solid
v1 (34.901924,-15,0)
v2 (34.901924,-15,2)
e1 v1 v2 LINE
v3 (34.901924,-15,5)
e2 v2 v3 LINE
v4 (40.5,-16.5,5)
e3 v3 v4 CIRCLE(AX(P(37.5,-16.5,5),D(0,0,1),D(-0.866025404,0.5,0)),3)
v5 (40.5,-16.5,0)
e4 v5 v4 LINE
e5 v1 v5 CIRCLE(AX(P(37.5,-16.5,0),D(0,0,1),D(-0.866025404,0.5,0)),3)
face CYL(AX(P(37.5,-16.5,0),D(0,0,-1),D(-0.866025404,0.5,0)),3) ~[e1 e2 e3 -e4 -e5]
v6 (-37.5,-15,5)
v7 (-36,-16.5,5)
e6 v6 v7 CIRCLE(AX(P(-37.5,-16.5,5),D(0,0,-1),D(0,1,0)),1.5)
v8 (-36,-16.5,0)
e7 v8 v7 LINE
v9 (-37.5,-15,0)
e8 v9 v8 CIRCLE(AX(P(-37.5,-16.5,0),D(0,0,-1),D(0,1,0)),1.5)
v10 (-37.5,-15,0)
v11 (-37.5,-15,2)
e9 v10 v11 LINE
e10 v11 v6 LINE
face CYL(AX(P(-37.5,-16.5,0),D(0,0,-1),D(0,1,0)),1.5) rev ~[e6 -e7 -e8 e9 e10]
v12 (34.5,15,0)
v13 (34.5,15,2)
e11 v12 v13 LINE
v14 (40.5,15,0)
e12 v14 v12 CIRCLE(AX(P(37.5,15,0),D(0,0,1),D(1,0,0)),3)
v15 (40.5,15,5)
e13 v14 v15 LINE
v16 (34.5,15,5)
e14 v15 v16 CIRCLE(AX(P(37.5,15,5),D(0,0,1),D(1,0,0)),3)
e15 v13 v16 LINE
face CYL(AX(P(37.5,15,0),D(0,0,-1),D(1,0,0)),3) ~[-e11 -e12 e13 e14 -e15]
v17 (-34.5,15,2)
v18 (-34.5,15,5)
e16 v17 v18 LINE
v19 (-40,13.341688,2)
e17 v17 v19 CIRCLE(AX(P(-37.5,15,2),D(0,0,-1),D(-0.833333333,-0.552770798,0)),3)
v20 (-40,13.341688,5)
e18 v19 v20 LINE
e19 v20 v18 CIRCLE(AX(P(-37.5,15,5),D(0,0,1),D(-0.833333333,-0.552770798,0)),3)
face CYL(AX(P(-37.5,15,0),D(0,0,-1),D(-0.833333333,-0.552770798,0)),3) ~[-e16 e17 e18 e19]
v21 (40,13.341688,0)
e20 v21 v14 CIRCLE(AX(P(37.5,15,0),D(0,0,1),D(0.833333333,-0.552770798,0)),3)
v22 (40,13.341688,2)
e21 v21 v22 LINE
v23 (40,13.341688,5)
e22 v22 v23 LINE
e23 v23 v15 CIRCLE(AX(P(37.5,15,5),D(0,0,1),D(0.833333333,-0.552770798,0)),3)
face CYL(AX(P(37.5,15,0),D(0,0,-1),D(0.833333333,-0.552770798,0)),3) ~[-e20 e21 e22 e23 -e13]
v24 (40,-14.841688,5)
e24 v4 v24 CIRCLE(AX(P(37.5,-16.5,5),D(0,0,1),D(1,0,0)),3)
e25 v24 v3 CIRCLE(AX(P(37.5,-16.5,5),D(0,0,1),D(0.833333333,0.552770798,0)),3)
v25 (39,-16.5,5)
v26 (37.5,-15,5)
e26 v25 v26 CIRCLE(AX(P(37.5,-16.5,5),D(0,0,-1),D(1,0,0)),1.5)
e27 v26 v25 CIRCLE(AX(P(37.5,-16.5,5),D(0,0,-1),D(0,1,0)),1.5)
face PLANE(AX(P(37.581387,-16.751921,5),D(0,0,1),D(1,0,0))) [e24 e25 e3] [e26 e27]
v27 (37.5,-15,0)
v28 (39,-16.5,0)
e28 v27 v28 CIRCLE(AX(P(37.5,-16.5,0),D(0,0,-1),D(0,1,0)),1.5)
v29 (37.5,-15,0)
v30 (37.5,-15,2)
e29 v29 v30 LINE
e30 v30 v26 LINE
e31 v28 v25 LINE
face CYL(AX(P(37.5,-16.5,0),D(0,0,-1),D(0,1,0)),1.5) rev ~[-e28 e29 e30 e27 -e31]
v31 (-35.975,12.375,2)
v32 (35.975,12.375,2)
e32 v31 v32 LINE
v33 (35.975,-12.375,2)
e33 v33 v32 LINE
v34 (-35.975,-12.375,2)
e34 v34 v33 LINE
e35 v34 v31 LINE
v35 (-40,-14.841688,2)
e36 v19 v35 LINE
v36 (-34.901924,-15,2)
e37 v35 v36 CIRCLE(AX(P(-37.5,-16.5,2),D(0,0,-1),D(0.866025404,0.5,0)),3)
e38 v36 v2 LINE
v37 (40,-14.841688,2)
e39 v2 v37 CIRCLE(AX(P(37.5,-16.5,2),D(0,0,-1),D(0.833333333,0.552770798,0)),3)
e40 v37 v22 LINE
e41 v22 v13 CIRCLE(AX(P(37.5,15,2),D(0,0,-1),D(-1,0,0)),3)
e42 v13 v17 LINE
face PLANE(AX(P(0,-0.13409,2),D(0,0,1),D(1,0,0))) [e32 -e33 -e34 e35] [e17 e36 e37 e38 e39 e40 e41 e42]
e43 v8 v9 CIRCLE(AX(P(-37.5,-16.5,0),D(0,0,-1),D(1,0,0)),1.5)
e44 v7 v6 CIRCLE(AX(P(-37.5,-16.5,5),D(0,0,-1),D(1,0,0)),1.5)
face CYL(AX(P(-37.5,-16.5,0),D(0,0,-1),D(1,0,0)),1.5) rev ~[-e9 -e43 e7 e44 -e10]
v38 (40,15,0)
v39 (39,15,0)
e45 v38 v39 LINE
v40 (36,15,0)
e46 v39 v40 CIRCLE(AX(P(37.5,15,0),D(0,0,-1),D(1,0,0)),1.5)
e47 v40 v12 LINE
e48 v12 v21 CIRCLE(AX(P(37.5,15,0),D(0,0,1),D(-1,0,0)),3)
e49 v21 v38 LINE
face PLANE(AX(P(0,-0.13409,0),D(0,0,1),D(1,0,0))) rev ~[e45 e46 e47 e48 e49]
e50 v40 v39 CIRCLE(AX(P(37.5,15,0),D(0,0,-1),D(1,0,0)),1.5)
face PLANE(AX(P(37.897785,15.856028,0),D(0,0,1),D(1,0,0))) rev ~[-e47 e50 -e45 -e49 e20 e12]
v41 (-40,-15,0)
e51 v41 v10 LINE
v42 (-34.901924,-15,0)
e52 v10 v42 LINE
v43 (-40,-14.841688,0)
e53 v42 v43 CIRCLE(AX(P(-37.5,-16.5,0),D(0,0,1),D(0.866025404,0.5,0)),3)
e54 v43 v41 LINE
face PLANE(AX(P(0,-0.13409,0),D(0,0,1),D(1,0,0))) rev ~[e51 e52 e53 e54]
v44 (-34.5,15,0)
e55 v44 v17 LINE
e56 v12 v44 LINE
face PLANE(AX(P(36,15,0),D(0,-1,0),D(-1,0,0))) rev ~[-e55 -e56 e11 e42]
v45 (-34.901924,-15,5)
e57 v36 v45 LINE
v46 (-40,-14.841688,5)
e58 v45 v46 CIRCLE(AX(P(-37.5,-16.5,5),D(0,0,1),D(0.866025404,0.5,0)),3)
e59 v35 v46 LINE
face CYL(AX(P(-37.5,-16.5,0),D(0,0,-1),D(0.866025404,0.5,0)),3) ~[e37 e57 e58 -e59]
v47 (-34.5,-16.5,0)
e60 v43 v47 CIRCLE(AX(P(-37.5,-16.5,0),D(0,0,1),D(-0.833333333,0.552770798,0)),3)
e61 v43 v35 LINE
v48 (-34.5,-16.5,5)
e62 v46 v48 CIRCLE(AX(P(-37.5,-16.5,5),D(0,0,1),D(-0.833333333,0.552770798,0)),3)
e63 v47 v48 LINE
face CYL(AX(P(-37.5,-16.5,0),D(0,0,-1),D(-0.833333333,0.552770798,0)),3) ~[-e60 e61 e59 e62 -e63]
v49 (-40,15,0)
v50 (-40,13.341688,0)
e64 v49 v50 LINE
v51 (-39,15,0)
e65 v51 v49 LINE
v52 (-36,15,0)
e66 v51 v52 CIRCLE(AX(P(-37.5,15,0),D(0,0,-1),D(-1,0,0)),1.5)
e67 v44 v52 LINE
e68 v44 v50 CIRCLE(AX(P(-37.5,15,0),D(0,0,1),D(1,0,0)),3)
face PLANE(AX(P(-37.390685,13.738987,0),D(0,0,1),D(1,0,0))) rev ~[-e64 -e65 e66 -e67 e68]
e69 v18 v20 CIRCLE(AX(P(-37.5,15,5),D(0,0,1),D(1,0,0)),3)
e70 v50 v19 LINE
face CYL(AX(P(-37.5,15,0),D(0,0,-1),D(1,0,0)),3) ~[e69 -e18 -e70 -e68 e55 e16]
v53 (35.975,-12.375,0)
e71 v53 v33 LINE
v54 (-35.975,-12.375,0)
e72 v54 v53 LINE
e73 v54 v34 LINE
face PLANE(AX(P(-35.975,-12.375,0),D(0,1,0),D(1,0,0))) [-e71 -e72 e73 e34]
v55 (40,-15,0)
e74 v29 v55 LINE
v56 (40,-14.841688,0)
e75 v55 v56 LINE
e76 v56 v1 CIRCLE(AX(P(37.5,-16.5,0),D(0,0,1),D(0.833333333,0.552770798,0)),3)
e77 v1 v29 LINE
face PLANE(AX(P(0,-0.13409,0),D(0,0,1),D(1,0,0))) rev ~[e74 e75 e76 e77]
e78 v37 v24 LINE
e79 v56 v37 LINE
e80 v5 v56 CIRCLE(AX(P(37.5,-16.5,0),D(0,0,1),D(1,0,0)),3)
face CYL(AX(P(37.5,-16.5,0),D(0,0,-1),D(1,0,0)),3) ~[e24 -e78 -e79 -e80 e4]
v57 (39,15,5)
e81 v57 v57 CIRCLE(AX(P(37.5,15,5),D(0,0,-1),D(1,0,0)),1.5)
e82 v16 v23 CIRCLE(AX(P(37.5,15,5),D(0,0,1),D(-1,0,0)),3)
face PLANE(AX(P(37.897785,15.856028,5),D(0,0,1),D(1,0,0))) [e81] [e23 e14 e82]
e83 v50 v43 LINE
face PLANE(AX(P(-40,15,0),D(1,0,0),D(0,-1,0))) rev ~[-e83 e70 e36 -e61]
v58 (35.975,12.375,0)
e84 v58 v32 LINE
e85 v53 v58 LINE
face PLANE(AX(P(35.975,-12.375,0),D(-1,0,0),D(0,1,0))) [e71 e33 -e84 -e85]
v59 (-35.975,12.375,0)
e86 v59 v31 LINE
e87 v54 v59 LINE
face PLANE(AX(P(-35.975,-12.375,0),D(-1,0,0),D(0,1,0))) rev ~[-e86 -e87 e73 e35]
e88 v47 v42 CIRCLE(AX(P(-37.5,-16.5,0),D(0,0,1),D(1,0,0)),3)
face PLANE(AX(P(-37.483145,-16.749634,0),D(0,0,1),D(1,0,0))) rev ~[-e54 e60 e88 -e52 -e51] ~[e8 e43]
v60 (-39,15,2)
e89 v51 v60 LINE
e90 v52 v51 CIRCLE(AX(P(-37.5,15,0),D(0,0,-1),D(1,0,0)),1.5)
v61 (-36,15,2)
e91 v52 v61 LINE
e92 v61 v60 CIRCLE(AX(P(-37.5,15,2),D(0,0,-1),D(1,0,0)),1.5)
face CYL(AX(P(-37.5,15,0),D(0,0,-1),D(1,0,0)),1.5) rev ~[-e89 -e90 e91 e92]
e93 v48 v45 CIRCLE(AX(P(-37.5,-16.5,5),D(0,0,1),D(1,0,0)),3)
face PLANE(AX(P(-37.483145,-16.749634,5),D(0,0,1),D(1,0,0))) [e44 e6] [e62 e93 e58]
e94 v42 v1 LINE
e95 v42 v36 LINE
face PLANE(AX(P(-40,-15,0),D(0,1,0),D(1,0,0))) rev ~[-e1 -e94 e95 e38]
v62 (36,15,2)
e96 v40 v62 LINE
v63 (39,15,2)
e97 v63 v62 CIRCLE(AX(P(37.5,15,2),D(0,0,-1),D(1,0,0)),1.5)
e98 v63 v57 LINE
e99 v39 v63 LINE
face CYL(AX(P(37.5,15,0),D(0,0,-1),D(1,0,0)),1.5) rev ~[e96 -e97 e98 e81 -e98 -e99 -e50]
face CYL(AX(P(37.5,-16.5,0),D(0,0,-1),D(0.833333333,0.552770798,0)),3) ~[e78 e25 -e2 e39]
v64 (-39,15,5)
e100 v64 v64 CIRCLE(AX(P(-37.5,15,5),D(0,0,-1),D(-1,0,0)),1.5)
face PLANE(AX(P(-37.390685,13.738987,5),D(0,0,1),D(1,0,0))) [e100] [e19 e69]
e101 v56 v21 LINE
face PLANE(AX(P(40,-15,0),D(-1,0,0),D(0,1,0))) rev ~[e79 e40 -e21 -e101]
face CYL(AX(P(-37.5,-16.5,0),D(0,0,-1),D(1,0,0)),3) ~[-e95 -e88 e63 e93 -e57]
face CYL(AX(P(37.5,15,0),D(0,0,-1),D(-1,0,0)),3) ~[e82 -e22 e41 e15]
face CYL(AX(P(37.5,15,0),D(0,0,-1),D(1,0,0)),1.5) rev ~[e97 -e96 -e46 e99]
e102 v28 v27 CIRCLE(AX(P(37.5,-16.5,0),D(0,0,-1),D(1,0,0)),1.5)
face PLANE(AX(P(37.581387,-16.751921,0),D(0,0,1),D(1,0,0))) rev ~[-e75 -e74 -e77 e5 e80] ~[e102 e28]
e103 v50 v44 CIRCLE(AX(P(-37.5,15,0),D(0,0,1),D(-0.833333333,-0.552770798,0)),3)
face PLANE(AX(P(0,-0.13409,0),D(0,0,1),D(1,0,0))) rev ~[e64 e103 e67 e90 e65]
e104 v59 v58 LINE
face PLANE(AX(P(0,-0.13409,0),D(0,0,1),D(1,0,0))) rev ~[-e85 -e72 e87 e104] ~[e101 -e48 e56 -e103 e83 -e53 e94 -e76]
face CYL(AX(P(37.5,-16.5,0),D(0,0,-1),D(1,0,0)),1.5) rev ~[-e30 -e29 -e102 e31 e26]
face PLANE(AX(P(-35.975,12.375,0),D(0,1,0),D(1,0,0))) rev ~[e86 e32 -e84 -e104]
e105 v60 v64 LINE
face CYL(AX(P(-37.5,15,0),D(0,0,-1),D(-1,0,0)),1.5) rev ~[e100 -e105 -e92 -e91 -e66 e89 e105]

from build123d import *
from build123d import SkipClean  # not in build123d's __all__

# Parameters (mm, degrees)
F0_W     = 71.95
F0_H     = 24.75
F1_DEPTH = 2
F2_DEPTH = 5


with BuildPart() as f1:
    # F0 (on Top) → F1 (new body)
    with BuildSketch(Plane.XY):
        with BuildLine():
            Line((34.5, 15), (-34.5, 15))
            ThreePointArc((-34.5, 15), (-36.6339745962, 12.1277186767), (-40, 13.3416876048))
            Line((-40, 13.3416876048), (-40, -14.8416876048))
            ThreePointArc((-40, -14.8416876048), (-37.4068848056, -13.5014454214), (-34.9019237886, -15))
            Line((-34.9019237886, -15), (34.9019237886, -15))
            ThreePointArc((34.9019237886, -15), (37.4068848056, -13.5014454214), (40, -14.8416876048))
            Line((40, -14.8416876048), (40, 13.3416876048))
            ThreePointArc((40, 13.3416876048), (36.6339745962, 12.1277186767), (34.5, 15))
        make_face()
        Rectangle(F0_W, F0_H, mode=Mode.SUBTRACT)
        with BuildLine():
            Line((-34.5, 15), (-36, 15))
            ThreePointArc((-36, 15), (-37.5, 13.5), (-39, 15))
            Line((-39, 15), (-40, 15))
            Line((-40, 15), (-40, 13.3416876048))
            ThreePointArc((-40, 13.3416876048), (-36.6339745962, 12.1277186767), (-34.5, 15))
        make_face()
        with BuildLine():
            Line((36, 15), (34.5, 15))
            ThreePointArc((34.5, 15), (36.6339745962, 12.1277186767), (40, 13.3416876048))
            Line((40, 13.3416876048), (40, 15))
            Line((40, 15), (39, 15))
            ThreePointArc((39, 15), (37.5, 13.5), (36, 15))
        make_face()
        with BuildLine():
            Line((40, -15), (40, -14.8416876048))
            ThreePointArc((40, -14.8416876048), (37.4068848056, -13.5014454214), (34.9019237886, -15))
            Line((34.9019237886, -15), (37.5, -15))
            Line((37.5, -15), (40, -15))
        make_face()
        with BuildLine():
            ThreePointArc((-34.9019237886, -15), (-37.4068848056, -13.5014454214), (-40, -14.8416876048))
            Line((-40, -14.8416876048), (-40, -15))
            Line((-40, -15), (-37.5, -15))
            Line((-37.5, -15), (-34.9019237886, -15))
        make_face()
    extrude(amount=F1_DEPTH)

    # F0 (on Top) → F2 (join)
    with BuildSketch(Plane.XY):
        with BuildLine():
            Line((-34.5, 15), (-36, 15))
            ThreePointArc((-36, 15), (-37.5, 13.5), (-39, 15))
            Line((-39, 15), (-40, 15))
            Line((-40, 15), (-40, 13.3416876048))
            ThreePointArc((-40, 13.3416876048), (-36.6339745962, 12.1277186767), (-34.5, 15))
        make_face()
        with BuildLine():
            ThreePointArc((-39, 15), (-37.5, 16.5), (-36, 15))
            Line((-36, 15), (-34.5, 15))
            ThreePointArc((-34.5, 15), (-38.3660254038, 17.8722813233), (-40, 13.3416876048))
            Line((-40, 13.3416876048), (-40, 15))
            Line((-40, 15), (-39, 15))
        make_face()
        with BuildLine():
            Line((-40, -15), (-40, -14.8416876048))
            ThreePointArc((-40, -14.8416876048), (-38.3660254038, -19.3722813233), (-34.5, -16.5))
            ThreePointArc((-34.5, -16.5), (-34.6022225211, -15.7235428647), (-34.9019237886, -15))
            Line((-34.9019237886, -15), (-37.5, -15))
            Line((-37.5, -15), (-40, -15))
        make_face()
        with BuildLine():
            ThreePointArc((-36, -16.5), (-38.5606601718, -17.5606601718), (-37.5, -15))
            ThreePointArc((-37.5, -15), (-36.4393398282, -15.4393398282), (-36, -16.5))
        make_face(mode=Mode.SUBTRACT)
        with BuildLine():
            ThreePointArc((-34.9019237886, -15), (-37.4068848056, -13.5014454214), (-40, -14.8416876048))
            Line((-40, -14.8416876048), (-40, -15))
            Line((-40, -15), (-37.5, -15))
            Line((-37.5, -15), (-34.9019237886, -15))
        make_face()
        with BuildLine():
            ThreePointArc((40.5, -16.5), (40.3722813233, -15.6339745962), (40, -14.8416876048))
            Line((40, -14.8416876048), (40, -15))
            Line((40, -15), (37.5, -15))
            Line((37.5, -15), (34.9019237886, -15))
            ThreePointArc((34.9019237886, -15), (36.7235428647, -19.3977774789), (40.5, -16.5))
        make_face()
        with BuildLine():
            ThreePointArc((39, -16.5), (36.4393398282, -17.5606601718), (37.5, -15))
            ThreePointArc((37.5, -15), (38.5606601718, -15.4393398282), (39, -16.5))
        make_face(mode=Mode.SUBTRACT)
        with BuildLine():
            Line((40, -15), (40, -14.8416876048))
            ThreePointArc((40, -14.8416876048), (37.4068848056, -13.5014454214), (34.9019237886, -15))
            Line((34.9019237886, -15), (37.5, -15))
            Line((37.5, -15), (40, -15))
        make_face()
        with BuildLine():
            ThreePointArc((40.5, 15), (37.5, 18), (34.5, 15))
            Line((34.5, 15), (36, 15))
            ThreePointArc((36, 15), (37.5, 16.5), (39, 15))
            Line((39, 15), (40, 15))
            Line((40, 15), (40, 13.3416876048))
            ThreePointArc((40, 13.3416876048), (40.3722813233, 14.1339745962), (40.5, 15))
        make_face()
        with BuildLine():
            Line((36, 15), (34.5, 15))
            ThreePointArc((34.5, 15), (36.6339745962, 12.1277186767), (40, 13.3416876048))
            Line((40, 13.3416876048), (40, 15))
            Line((40, 15), (39, 15))
            ThreePointArc((39, 15), (37.5, 13.5), (36, 15))
        make_face()
    with SkipClean():  # cleaning this boolean's faces spoils the solid; the shape is the same uncleaned
        extrude(amount=F2_DEPTH)


solid = f1.part
